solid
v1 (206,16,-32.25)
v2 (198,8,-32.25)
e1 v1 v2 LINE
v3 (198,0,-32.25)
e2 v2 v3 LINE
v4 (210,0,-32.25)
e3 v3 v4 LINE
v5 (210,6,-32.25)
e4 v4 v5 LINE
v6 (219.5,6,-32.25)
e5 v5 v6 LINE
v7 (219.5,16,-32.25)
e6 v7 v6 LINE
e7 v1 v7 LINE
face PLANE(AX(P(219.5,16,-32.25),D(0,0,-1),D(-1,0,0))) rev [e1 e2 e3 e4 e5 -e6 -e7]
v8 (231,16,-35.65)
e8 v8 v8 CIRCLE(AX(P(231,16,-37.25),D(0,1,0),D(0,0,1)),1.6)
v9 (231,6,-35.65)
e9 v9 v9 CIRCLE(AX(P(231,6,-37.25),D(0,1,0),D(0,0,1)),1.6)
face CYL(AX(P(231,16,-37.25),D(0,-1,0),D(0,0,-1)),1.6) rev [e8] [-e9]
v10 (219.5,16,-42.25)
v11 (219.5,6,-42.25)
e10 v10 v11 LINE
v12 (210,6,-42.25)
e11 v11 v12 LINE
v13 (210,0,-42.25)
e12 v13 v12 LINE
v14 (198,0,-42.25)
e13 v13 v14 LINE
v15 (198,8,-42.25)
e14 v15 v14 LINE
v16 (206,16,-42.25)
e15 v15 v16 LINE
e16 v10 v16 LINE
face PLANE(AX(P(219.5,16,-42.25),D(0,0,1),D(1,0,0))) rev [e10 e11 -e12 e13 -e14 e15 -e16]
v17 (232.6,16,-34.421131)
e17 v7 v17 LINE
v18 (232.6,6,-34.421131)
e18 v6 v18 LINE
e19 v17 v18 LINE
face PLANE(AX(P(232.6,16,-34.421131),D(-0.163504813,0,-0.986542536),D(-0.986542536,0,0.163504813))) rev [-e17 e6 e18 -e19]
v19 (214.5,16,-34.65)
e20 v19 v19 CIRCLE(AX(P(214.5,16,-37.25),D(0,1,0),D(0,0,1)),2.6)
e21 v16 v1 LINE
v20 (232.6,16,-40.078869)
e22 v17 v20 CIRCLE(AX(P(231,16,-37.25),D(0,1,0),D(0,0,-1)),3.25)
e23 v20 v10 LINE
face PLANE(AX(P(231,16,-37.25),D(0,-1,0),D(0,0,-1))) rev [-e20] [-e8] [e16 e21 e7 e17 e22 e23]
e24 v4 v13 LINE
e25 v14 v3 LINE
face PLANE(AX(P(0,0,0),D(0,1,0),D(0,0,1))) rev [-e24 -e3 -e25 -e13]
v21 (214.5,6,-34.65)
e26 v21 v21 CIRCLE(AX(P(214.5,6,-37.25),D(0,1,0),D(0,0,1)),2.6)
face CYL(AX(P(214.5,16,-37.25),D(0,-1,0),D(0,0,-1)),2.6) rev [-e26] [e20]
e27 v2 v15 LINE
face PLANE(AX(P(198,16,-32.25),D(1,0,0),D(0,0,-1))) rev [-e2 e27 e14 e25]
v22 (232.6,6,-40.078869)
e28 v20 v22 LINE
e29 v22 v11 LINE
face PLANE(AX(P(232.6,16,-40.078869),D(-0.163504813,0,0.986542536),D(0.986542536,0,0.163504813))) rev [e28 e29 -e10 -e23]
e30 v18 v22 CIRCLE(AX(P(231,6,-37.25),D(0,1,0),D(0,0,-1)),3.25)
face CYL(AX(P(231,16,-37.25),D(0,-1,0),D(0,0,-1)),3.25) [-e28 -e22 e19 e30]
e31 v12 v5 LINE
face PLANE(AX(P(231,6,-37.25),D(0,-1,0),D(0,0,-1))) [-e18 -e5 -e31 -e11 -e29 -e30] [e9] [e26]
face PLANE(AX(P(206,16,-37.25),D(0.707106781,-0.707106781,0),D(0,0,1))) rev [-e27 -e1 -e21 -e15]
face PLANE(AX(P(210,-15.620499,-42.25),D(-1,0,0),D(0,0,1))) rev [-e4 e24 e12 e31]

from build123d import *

# Parameters (mm, degrees)
SKETCH1_R             = 5.9875
SKETCH1_R_2           = 1.7
SKETCH1_R_3           = 1.6
BOSS_EXTRUDE1_DEPTH   = 6
MOVE_FACE1_BY         = 5
MOVE_FACE1_2_BY       = 5
MOVE_FACE1_3_BY       = 5
MOVE_FACE1_4_BY       = 5
M4X0_7_TAPPED_HOLE2_D = 3.3
POCKET_WALLS_DEPTH    = 2.6
RIB_PATTERN_DEPTH     = 3
MOVE_FACE2_BY         = 4.5
MOVE_FACE2_2_BY       = 4.5
MOVE_FACE2_3_BY       = 4.5
MOVE_FACE2_4_BY       = 4.5
MOVE_FACE2_5_BY       = 4.5
MOVE_FACE2_6_BY       = 4.5
MOVE_FACE2_7_BY       = 4.5
MOVE_FACE2_8_BY       = 4.5
MOVE_FACE2_9_BY       = 4.5
MOVE_FACE2_10_BY      = 4.5
MOVE_FACE2_11_BY      = 4.5
MOVE_FACE2_12_BY      = 4.5
MOVE_FACE2_13_BY      = 4.5
MOVE_FACE2_14_BY      = 4.5
BOSS_EXTRUDE6_REACH   = 382.427
SKETCH19_W            = 1
SKETCH19_H            = 3
BOSS_EXTRUDE7_REACH   = 375.768
SKETCH20_W            = 1
SKETCH20_H            = 3
CUT_EXTRUDE4_DEPTH    = 4.5
POCKET_FILLETS_R      = 2.5
FILLET9_R             = 3
MOVE_FACE3_BY         = 12
MOVE_FACE3_2_BY       = 12
SKETCH23_W            = 12
SKETCH23_H            = 38.175
CUT_EXTRUDE5_DEPTH    = 245.489391385
MOVE_FACE4_BY         = 4
MOVE_FACE4_2_BY       = 4
FILLET6_R             = 5
FILLET7_R             = 11
FILLET8_START         = -1
FILLET8_DEPTH         = 8
FILLET8_2_DEPTH       = 6
SKETCH25_R            = 1.6
SKETCH25_R_2          = 2.6
BOSS_EXTRUDE9_DEPTH   = 10
SKETCH26_W            = 12
SKETCH26_H            = 10
BOSS_EXTRUDE10_DEPTH  = 6
CHAMFER2_SIZE         = 8


with BuildPart() as part:
    # Sketch1 → Boss-Extrude1 (new body)
    with BuildSketch(Plane(origin=(0, 0, 0), x_dir=(1, 0, 0), z_dir=(0, 1, 0))):
        Polygon((-240, 46.25), (-198, 46.25), (-198, 26.5), (198, 26.5), (198, 46.25), (240, 46.25), (240, -18.75), (201, -18.75), (201, 0), (-201, 0), (-201, -18.75), (-240, -18.75), align=None)
        with Locations(Location((-231, 24.425, 0), (0, 0, 270))):
            Circle(SKETCH1_R, mode=Mode.SUBTRACT)
        with Locations(Location((-214.5, 37.25, 0), (0, 0, 270))):
            Circle(SKETCH1_R, mode=Mode.SUBTRACT)
        with Locations(Location((214.5, 37.25, 0), (0, 0, 90))):
            Circle(SKETCH1_R, mode=Mode.SUBTRACT)
        with Locations(Location((231, 24.425, 0), (0, 0, 90))):
            Circle(SKETCH1_R, mode=Mode.SUBTRACT)
        with Locations(Location((-204.5, -6.05, 0), (0, 0, 270))):
            Circle(SKETCH1_R_2, mode=Mode.SUBTRACT)
        with Locations(Location((-224.5, -6.05, 0), (0, 0, 270))):
            Circle(SKETCH1_R_2, mode=Mode.SUBTRACT)
        with Locations(Location((-204.5, 13.95, 0), (0, 0, 270))):
            Circle(SKETCH1_R_2, mode=Mode.SUBTRACT)
        with Locations(Location((-224.5, 13.95, 0), (0, 0, 270))):
            Circle(SKETCH1_R_2, mode=Mode.SUBTRACT)
        with Locations(Location((204.5, -6.05, 0), (0, 0, 90))):
            Circle(SKETCH1_R_2, mode=Mode.SUBTRACT)
        with Locations(Location((204.5, 13.95, 0), (0, 0, 90))):
            Circle(SKETCH1_R_2, mode=Mode.SUBTRACT)
        with Locations(Location((224.5, 13.95, 0), (0, 0, 90))):
            Circle(SKETCH1_R_2, mode=Mode.SUBTRACT)
        with Locations(Location((224.5, -6.05, 0), (0, 0, 90))):
            Circle(SKETCH1_R_2, mode=Mode.SUBTRACT)
        with Locations(Location((-187.5, 13.25, 0), (0, 0, 270))):
            Circle(SKETCH1_R_3, mode=Mode.SUBTRACT)
        with Locations(Location((-162.5, 13.25, 0), (0, 0, 270))):
            Circle(SKETCH1_R_3, mode=Mode.SUBTRACT)
        with Locations(Location((-137.5, 13.25, 0), (0, 0, 270))):
            Circle(SKETCH1_R_3, mode=Mode.SUBTRACT)
        with Locations(Location((-112.5, 13.25, 0), (0, 0, 270))):
            Circle(SKETCH1_R_3, mode=Mode.SUBTRACT)
        with Locations(Location((-87.5, 13.25, 0), (0, 0, 270))):
            Circle(SKETCH1_R_3, mode=Mode.SUBTRACT)
        with Locations(Location((-62.5, 13.25, 0), (0, 0, 270))):
            Circle(SKETCH1_R_3, mode=Mode.SUBTRACT)
        with Locations(Location((-37.5, 13.25, 0), (0, 0, 270))):
            Circle(SKETCH1_R_3, mode=Mode.SUBTRACT)
        with Locations(Location((-12.5, 13.25, 0), (0, 0, 270))):
            Circle(SKETCH1_R_3, mode=Mode.SUBTRACT)
        with Locations(Location((12.5, 13.25, 0), (0, 0, 270))):
            Circle(SKETCH1_R_3, mode=Mode.SUBTRACT)
        with Locations(Location((37.5, 13.25, 0), (0, 0, 270))):
            Circle(SKETCH1_R_3, mode=Mode.SUBTRACT)
        with Locations(Location((62.5, 13.25, 0), (0, 0, 270))):
            Circle(SKETCH1_R_3, mode=Mode.SUBTRACT)
        with Locations(Location((87.5, 13.25, 0), (0, 0, 270))):
            Circle(SKETCH1_R_3, mode=Mode.SUBTRACT)
        with Locations(Location((112.5, 13.25, 0), (0, 0, 270))):
            Circle(SKETCH1_R_3, mode=Mode.SUBTRACT)
        with Locations(Location((137.5, 13.25, 0), (0, 0, 270))):
            Circle(SKETCH1_R_3, mode=Mode.SUBTRACT)
        with Locations(Location((-231, 37.25, 0), (0, 0, 270))):
            Circle(SKETCH1_R_3, mode=Mode.SUBTRACT)
        with Locations(Location((231, 37.25, 0), (0, 0, 90))):
            Circle(SKETCH1_R_3, mode=Mode.SUBTRACT)
        with Locations(Location((162.5, 13.25, 0), (0, 0, 270))):
            Circle(SKETCH1_R_3, mode=Mode.SUBTRACT)
        with Locations(Location((187.5, 13.25, 0), (0, 0, 270))):
            Circle(SKETCH1_R_3, mode=Mode.SUBTRACT)
    extrude(amount=BOSS_EXTRUDE1_DEPTH)

    # Move Face1: a curved face moved outward by 5.0
    add(Solid.thicken(part.faces().sort_by_distance((231, 3, -18.4375))[0], MOVE_FACE1_BY))

    # Move Face1 2: a curved face moved outward by 5.0
    add(Solid.thicken(part.faces().sort_by_distance((214.5, 3, -31.2625))[0], MOVE_FACE1_2_BY))

    # Move Face1 3: a curved face moved outward by 5.0
    add(Solid.thicken(part.faces().sort_by_distance((-214.5, 3, -43.2375))[0], MOVE_FACE1_3_BY))

    # Move Face1 4: a curved face moved outward by 5.0
    add(Solid.thicken(part.faces().sort_by_distance((-231, 3, -30.4125))[0], MOVE_FACE1_4_BY))

    # M4x0.7 Tapped Hole2 (through all)
    with Locations(Plane(origin=(0, 6, 0), x_dir=(1, 0, 0), z_dir=(0, 1, 0))):
        with Locations((-214.5, 37.25), (-231, 24.425), (231, 24.425), (214.5, 37.25)):
            Hole(M4X0_7_TAPPED_HOLE2_D / 2)

    # Sketch13 → Pocket Walls (add)
    with BuildSketch(Plane.XY):
        Polygon((-214, 6), (-208.803847577, 9), (208.803847577, 9), (214, 6), align=None)
    pocket_walls = extrude(amount=-POCKET_WALLS_DEPTH)

    # Mirror1: Pocket Walls across plane
    add(pocket_walls.mirror(Plane.XY.offset(-13.25)))

    # zig_zag_style_1 → Rib Pattern (add)
    with BuildSketch(Plane(origin=(0, 6, 0), x_dir=(1, 0, 0), z_dir=(0, 1, 0))):
        Polygon((-186.851468198, 1.838812439), (-162.5, 22.586263345), (-137.5, 1.286263345), (-112.5, 22.586263345), (-87.5, 1.286263345), (-62.5, 22.586263345), (-37.5, 1.286263345), (-12.5, 22.586263345), (12.5, 1.286263345), (37.5, 22.586263345), (62.5, 1.286263345), (87.5, 22.586263345), (112.5, 1.286263345), (137.5, 22.586263345), (162.5, 1.286263345), (188.148531802, 23.138812439), (186.851468198, 24.661187561), (162.5, 3.913736655), (137.5, 25.213736655), (112.5, 3.913736655), (87.5, 25.213736655), (62.5, 3.913736655), (37.5, 25.213736655), (12.5, 3.913736655), (-12.5, 25.213736655), (-37.5, 3.913736655), (-62.5, 25.213736655), (-87.5, 3.913736655), (-112.5, 25.213736655), (-137.5, 3.913736655), (-162.5, 25.213736655), (-188.148531802, 3.361187561), align=None)
    extrude(amount=RIB_PATTERN_DEPTH)

    # Move Face2: a face moved inward by 4.5
    extrude(part.faces().sort_by_distance((162.5, 6, -17.307514961))[0], amount=MOVE_FACE2_BY, dir=(0, -1, 0), mode=Mode.SUBTRACT)

    # Move Face2 2: a face moved inward by 4.5
    extrude(part.faces().sort_by_distance((137.5, 6, -9.192485039))[0], amount=MOVE_FACE2_2_BY, dir=(0, -1, 0), mode=Mode.SUBTRACT)

    # Move Face2 3: a face moved inward by 4.5
    extrude(part.faces().sort_by_distance((112.5, 6, -17.307514961))[0], amount=MOVE_FACE2_3_BY, dir=(0, -1, 0), mode=Mode.SUBTRACT)

    # Move Face2 4: a face moved inward by 4.5
    extrude(part.faces().sort_by_distance((87.5, 6, -9.192485039))[0], amount=MOVE_FACE2_4_BY, dir=(0, -1, 0), mode=Mode.SUBTRACT)

    # Move Face2 5: a face moved inward by 4.5
    extrude(part.faces().sort_by_distance((62.5, 6, -17.307514961))[0], amount=MOVE_FACE2_5_BY, dir=(0, -1, 0), mode=Mode.SUBTRACT)

    # Move Face2 6: a face moved inward by 4.5
    extrude(part.faces().sort_by_distance((37.5, 6, -9.192485039))[0], amount=MOVE_FACE2_6_BY, dir=(0, -1, 0), mode=Mode.SUBTRACT)

    # Move Face2 7: a face moved inward by 4.5
    extrude(part.faces().sort_by_distance((12.5, 6, -17.307514961))[0], amount=MOVE_FACE2_7_BY, dir=(0, -1, 0), mode=Mode.SUBTRACT)

    # Move Face2 8: a face moved inward by 4.5
    extrude(part.faces().sort_by_distance((-12.5, 6, -9.192485039))[0], amount=MOVE_FACE2_8_BY, dir=(0, -1, 0), mode=Mode.SUBTRACT)

    # Move Face2 9: a face moved inward by 4.5
    extrude(part.faces().sort_by_distance((-37.5, 6, -17.307514961))[0], amount=MOVE_FACE2_9_BY, dir=(0, -1, 0), mode=Mode.SUBTRACT)

    # Move Face2 10: a face moved inward by 4.5
    extrude(part.faces().sort_by_distance((-62.5, 6, -9.192485039))[0], amount=MOVE_FACE2_10_BY, dir=(0, -1, 0), mode=Mode.SUBTRACT)

    # Move Face2 11: a face moved inward by 4.5
    extrude(part.faces().sort_by_distance((-87.5, 6, -17.307514961))[0], amount=MOVE_FACE2_11_BY, dir=(0, -1, 0), mode=Mode.SUBTRACT)

    # Move Face2 12: a face moved inward by 4.5
    extrude(part.faces().sort_by_distance((-112.5, 6, -9.192485039))[0], amount=MOVE_FACE2_12_BY, dir=(0, -1, 0), mode=Mode.SUBTRACT)

    # Move Face2 13: a face moved inward by 4.5
    extrude(part.faces().sort_by_distance((-162.5, 6, -9.192485039))[0], amount=MOVE_FACE2_13_BY, dir=(0, -1, 0), mode=Mode.SUBTRACT)

    # Move Face2 14: a face moved inward by 4.5
    extrude(part.faces().sort_by_distance((-137.5, 6, -17.307514961))[0], amount=MOVE_FACE2_14_BY, dir=(0, -1, 0), mode=Mode.SUBTRACT)

    # Boss-Extrude6: up to this face of the body (flat: up to its plane)
    boss_extrude6_end = Plane(part.part.faces().sort_by_distance((199.498029235, 7.445651316, -23.9))[0])
    # Sketch19 → Boss-Extrude6 (add, up to the picked face)
    with BuildSketch(Plane(origin=(120.437057913, 0, -102.612373342), x_dir=(-0.6485318015860708, 0, -0.7611875605470214), z_dir=(0.7611875605470213, 0, -0.6485318015860707)), mode=Mode.PRIVATE) as boss_extrude6_sk1:
        with Locations((-103.9073301, 7.5)):
            Rectangle(SKETCH19_W, SKETCH19_H)
    boss_extrude6_tool1 = split(extrude(boss_extrude6_sk1.sketch, amount=BOSS_EXTRUDE6_REACH, mode=Mode.PRIVATE), bisect_by=boss_extrude6_end, keep=Keep.BOTH, mode=Mode.PRIVATE)
    add(boss_extrude6_tool1.solids().sort_by(Axis((187.824266, 7.5, -23.519406), (0.7611875605470213, 0, -0.6485318015860707)))[0])

    # Boss-Extrude7: up to this face of the body (flat: up to its plane)
    boss_extrude7_end = Plane(part.part.faces().sort_by_distance((-199.498029235, 7.445651316, -2.6))[0])
    # Sketch20 → Boss-Extrude7 (add, up to the picked face)
    with BuildSketch(Plane(origin=(-107.355217903, 0, 91.466645654), x_dir=(0.6485318015860708, 0, 0.7611875605470213), z_dir=(-0.7611875605470213, 0, 0.6485318015860708)), mode=Mode.PRIVATE) as boss_extrude7_sk1:
        with Locations((-124.078800455, 7.5)):
            Rectangle(SKETCH20_W, SKETCH20_H)
    boss_extrude7_tool1 = split(extrude(boss_extrude7_sk1.sketch, amount=BOSS_EXTRUDE7_REACH, mode=Mode.PRIVATE), bisect_by=boss_extrude7_end, keep=Keep.BOTH, mode=Mode.PRIVATE)
    add(boss_extrude7_tool1.solids().sort_by(Axis((-187.824266, 7.5, -2.980594), (-0.7611875605470213, 0, 0.6485318015860708)))[0])

    # Sketch22 → Cut-Extrude4 (cut)
    with BuildSketch(Plane(origin=(0, 6, 0), x_dir=(1, 0, 0), z_dir=(0, 1, 0))):
        Polygon((-201, 2.6), (-201, 23.9), (-164.041944431, 23.9), (-189.041944431, 2.6), align=None)
        Polygon((201, 2.6), (201, 23.9), (189.041944431, 23.9), (164.041944431, 2.6), align=None)
    extrude(amount=-CUT_EXTRUDE4_DEPTH, mode=Mode.SUBTRACT)

    # Pocket FIllets
    pocket_fillets_edges = [part.edges().sort_by_distance(p)[0] for p in [
        (185.958055569, 5.25, -23.9),
        (139.041944431, 5.25, -23.9),
        (135.958055569, 5.25, -23.9),
        (89.041944431, 5.25, -23.9),
        (85.958055569, 5.25, -23.9),
        (39.041944431, 5.25, -23.9),
        (35.958055569, 5.25, -23.9),
        (-10.958055569, 5.25, -23.9),
        (-14.041944431, 5.25, -23.9),
        (-60.958055569, 5.25, -23.9),
        (-64.041944431, 5.25, -23.9),
        (-110.958055569, 5.25, -23.9),
        (-114.041944431, 5.25, -23.9),
        (-160.958055569, 5.25, -23.9),
        (-164.041944431, 5.25, -23.9),
        (164.041944431, 5.25, -2.6),
        (-185.958055569, 5.25, -2.6),
        (-139.041944431, 5.25, -2.6),
        (-135.958055569, 5.25, -2.6),
        (-89.041944431, 5.25, -2.6),
        (-85.958055569, 5.25, -2.6),
        (-39.041944431, 5.25, -2.6),
        (-35.958055569, 5.25, -2.6),
        (10.958055569, 5.25, -2.6),
        (14.041944431, 5.25, -2.6),
        (60.958055569, 5.25, -2.6),
        (64.041944431, 5.25, -2.6),
        (110.958055569, 5.25, -2.6),
        (114.041944431, 5.25, -2.6),
        (160.958055569, 5.25, -2.6),
        (137.5, 5.25, -22.586263345),
        (87.5, 5.25, -22.586263345),
        (37.5, 5.25, -22.586263345),
        (-12.5, 5.25, -22.586263345),
        (-62.5, 5.25, -22.586263345),
        (-112.5, 5.25, -22.586263345),
        (-162.5, 5.25, -22.586263345),
        (-137.5, 5.25, -3.913736655),
        (-87.5, 5.25, -3.913736655),
        (-37.5, 5.25, -3.913736655),
        (12.5, 5.25, -3.913736655),
        (62.5, 5.25, -3.913736655),
        (112.5, 5.25, -3.913736655),
        (162.5, 5.25, -3.913736655),
        (189.041944431, 5.25, -23.9),
        (-189.041944431, 5.25, -2.6),
    ]]
    fillet(pocket_fillets_edges, radius=POCKET_FILLETS_R)

    # Fillet9
    fillet9_edges = [part.edges().sort_by_distance(p)[0] for p in [
        (-201, 3.75, -2.6),
        (-201, 3.75, -23.9),
        (201, 3.75, -2.6),
        (201, 3.75, -23.9),
    ]]
    fillet(fillet9_edges, radius=FILLET9_R)

    # Move Face3: a face moved inward by 12.0
    extrude(part.faces().sort_by_distance((198, 3, -36.375))[0], amount=MOVE_FACE3_BY, dir=(1, 0, 0), mode=Mode.SUBTRACT)

    # Move Face3 2: a face moved inward by 12.0
    extrude(part.faces().sort_by_distance((-198, 3, -36.375))[0], amount=MOVE_FACE3_2_BY, dir=(-1, 0, 0), mode=Mode.SUBTRACT)

    # Sketch23 → Cut-Extrude5 (cut, through all)
    with BuildSketch(Plane(origin=(0, 6, 0), x_dir=(1, 0, 0), z_dir=(0, 1, 0))):
        with Locations((-234, 0.3375)):
            Rectangle(SKETCH23_W, SKETCH23_H)
        with Locations((234, 0.3375)):
            Rectangle(SKETCH23_W, SKETCH23_H)
    extrude(amount=-CUT_EXTRUDE5_DEPTH, mode=Mode.SUBTRACT)

    # Move Face4: a face moved inward by 4.0
    extrude(part.faces().sort_by_distance((-240, 3, -32.8375))[0], amount=MOVE_FACE4_BY, dir=(1, 0, 0), mode=Mode.SUBTRACT)

    # Move Face4 2: a face moved inward by 4.0
    extrude(part.faces().sort_by_distance((240, 3, -32.8375))[0], amount=MOVE_FACE4_2_BY, dir=(-1, 0, 0), mode=Mode.SUBTRACT)

    # Fillet6
    fillet6_edges = [part.edges().sort_by_distance(p)[0] for p in [
        (-210, 3, -46.25),
        (-210, 3, -26.5),
        (210, 3, -26.5),
        (210, 3, -46.25),
        (201, 3, 18.75),
        (201, 3, 0),
        (-201, 3, 0),
        (-201, 3, 18.75),
        (-228, 3, 18.75),
        (228, 3, 18.75),
    ]]
    fillet(fillet6_edges, radius=FILLET6_R)

    # Fillet7
    fillet7_edges = [part.edges().sort_by_distance(p)[0] for p in [
        (-236, 3, -46.25),
        (236, 3, -46.25),
    ]]
    fillet(fillet7_edges, radius=FILLET7_R)

    # Fillet8: read off the stored shape, not the designer's step
    # Fillet8 outline → Fillet8 (cut)
    with BuildSketch(Plane(origin=(0, 0, 0), x_dir=(1, 0, 0), z_dir=(0, 1, 0)).offset(FILLET8_START)):
        with BuildLine():
            Line((-236, 19.425), (-232, 19.425))
            ThreePointArc((-232, 19.425), (-234.828427125, 20.596572875), (-236, 23.425))
            Line((-236, 23.425), (-236, 19.425))
        make_face()
        with BuildLine():
            ThreePointArc((236, 23.425), (234.828427125, 20.596572875), (232, 19.425))
            Line((232, 19.425), (236, 19.425))
            Line((236, 19.425), (236, 23.425))
        make_face()
    extrude(amount=FILLET8_DEPTH, mode=Mode.SUBTRACT)

    # Fillet8 2 outline → Fillet8 2 (add)
    with BuildSketch(Plane(origin=(0, 0, 0), x_dir=(1, 0, 0), z_dir=(0, 1, 0))):
        with BuildLine():
            Line((-228, 19.425), (-232, 19.425))
            ThreePointArc((-232, 19.425), (-229.171572875, 18.253427125), (-228, 15.425))
            Line((-228, 15.425), (-228, 19.425))
        make_face()
        with BuildLine():
            Line((228, 19.425), (228, 15.425))
            ThreePointArc((228, 15.425), (229.171572875, 18.253427125), (232, 19.425))
            Line((232, 19.425), (228, 19.425))
        make_face()
    extrude(amount=FILLET8_2_DEPTH)


with BuildPart() as body_2:
    # Sketch25 → Boss-Extrude9 (new body)
    with BuildSketch(Plane(origin=(0, 6, 0), x_dir=(1, 0, 0), z_dir=(0, 1, 0))):
        with BuildLine():
            Line((198, 32.25), (198, 42.25))
            Line((198, 42.25), (219.5, 42.25))
            Line((219.5, 42.25), (232.6, 40.078869032))
            ThreePointArc((232.6, 40.078869032), (234.25, 37.25), (232.6, 34.421130968))
            Line((232.6, 34.421130968), (219.5, 32.25))
            Line((219.5, 32.25), (198, 32.25))
        make_face()
        with Locations(Location((231, 37.25, 0), (0, 0, 270))):
            Circle(SKETCH25_R, mode=Mode.SUBTRACT)
        with Locations(Location((214.5, 37.25, 0), (0, 0, 270))):
            Circle(SKETCH25_R_2, mode=Mode.SUBTRACT)
    extrude(amount=BOSS_EXTRUDE9_DEPTH)

    # Sketch26 → Boss-Extrude10 (add)
    with BuildSketch(Plane.XZ.offset(-6)):
        with Locations((204, -37.25)):
            Rectangle(SKETCH26_W, SKETCH26_H)
    extrude(amount=BOSS_EXTRUDE10_DEPTH)

    # Chamfer2
    chamfer2_edges = [body_2.edges().sort_by_distance(p)[0] for p in [
        (198, 16, -37.25),
    ]]
    chamfer(chamfer2_edges, length=CHAMFER2_SIZE)


solid = body_2.part
